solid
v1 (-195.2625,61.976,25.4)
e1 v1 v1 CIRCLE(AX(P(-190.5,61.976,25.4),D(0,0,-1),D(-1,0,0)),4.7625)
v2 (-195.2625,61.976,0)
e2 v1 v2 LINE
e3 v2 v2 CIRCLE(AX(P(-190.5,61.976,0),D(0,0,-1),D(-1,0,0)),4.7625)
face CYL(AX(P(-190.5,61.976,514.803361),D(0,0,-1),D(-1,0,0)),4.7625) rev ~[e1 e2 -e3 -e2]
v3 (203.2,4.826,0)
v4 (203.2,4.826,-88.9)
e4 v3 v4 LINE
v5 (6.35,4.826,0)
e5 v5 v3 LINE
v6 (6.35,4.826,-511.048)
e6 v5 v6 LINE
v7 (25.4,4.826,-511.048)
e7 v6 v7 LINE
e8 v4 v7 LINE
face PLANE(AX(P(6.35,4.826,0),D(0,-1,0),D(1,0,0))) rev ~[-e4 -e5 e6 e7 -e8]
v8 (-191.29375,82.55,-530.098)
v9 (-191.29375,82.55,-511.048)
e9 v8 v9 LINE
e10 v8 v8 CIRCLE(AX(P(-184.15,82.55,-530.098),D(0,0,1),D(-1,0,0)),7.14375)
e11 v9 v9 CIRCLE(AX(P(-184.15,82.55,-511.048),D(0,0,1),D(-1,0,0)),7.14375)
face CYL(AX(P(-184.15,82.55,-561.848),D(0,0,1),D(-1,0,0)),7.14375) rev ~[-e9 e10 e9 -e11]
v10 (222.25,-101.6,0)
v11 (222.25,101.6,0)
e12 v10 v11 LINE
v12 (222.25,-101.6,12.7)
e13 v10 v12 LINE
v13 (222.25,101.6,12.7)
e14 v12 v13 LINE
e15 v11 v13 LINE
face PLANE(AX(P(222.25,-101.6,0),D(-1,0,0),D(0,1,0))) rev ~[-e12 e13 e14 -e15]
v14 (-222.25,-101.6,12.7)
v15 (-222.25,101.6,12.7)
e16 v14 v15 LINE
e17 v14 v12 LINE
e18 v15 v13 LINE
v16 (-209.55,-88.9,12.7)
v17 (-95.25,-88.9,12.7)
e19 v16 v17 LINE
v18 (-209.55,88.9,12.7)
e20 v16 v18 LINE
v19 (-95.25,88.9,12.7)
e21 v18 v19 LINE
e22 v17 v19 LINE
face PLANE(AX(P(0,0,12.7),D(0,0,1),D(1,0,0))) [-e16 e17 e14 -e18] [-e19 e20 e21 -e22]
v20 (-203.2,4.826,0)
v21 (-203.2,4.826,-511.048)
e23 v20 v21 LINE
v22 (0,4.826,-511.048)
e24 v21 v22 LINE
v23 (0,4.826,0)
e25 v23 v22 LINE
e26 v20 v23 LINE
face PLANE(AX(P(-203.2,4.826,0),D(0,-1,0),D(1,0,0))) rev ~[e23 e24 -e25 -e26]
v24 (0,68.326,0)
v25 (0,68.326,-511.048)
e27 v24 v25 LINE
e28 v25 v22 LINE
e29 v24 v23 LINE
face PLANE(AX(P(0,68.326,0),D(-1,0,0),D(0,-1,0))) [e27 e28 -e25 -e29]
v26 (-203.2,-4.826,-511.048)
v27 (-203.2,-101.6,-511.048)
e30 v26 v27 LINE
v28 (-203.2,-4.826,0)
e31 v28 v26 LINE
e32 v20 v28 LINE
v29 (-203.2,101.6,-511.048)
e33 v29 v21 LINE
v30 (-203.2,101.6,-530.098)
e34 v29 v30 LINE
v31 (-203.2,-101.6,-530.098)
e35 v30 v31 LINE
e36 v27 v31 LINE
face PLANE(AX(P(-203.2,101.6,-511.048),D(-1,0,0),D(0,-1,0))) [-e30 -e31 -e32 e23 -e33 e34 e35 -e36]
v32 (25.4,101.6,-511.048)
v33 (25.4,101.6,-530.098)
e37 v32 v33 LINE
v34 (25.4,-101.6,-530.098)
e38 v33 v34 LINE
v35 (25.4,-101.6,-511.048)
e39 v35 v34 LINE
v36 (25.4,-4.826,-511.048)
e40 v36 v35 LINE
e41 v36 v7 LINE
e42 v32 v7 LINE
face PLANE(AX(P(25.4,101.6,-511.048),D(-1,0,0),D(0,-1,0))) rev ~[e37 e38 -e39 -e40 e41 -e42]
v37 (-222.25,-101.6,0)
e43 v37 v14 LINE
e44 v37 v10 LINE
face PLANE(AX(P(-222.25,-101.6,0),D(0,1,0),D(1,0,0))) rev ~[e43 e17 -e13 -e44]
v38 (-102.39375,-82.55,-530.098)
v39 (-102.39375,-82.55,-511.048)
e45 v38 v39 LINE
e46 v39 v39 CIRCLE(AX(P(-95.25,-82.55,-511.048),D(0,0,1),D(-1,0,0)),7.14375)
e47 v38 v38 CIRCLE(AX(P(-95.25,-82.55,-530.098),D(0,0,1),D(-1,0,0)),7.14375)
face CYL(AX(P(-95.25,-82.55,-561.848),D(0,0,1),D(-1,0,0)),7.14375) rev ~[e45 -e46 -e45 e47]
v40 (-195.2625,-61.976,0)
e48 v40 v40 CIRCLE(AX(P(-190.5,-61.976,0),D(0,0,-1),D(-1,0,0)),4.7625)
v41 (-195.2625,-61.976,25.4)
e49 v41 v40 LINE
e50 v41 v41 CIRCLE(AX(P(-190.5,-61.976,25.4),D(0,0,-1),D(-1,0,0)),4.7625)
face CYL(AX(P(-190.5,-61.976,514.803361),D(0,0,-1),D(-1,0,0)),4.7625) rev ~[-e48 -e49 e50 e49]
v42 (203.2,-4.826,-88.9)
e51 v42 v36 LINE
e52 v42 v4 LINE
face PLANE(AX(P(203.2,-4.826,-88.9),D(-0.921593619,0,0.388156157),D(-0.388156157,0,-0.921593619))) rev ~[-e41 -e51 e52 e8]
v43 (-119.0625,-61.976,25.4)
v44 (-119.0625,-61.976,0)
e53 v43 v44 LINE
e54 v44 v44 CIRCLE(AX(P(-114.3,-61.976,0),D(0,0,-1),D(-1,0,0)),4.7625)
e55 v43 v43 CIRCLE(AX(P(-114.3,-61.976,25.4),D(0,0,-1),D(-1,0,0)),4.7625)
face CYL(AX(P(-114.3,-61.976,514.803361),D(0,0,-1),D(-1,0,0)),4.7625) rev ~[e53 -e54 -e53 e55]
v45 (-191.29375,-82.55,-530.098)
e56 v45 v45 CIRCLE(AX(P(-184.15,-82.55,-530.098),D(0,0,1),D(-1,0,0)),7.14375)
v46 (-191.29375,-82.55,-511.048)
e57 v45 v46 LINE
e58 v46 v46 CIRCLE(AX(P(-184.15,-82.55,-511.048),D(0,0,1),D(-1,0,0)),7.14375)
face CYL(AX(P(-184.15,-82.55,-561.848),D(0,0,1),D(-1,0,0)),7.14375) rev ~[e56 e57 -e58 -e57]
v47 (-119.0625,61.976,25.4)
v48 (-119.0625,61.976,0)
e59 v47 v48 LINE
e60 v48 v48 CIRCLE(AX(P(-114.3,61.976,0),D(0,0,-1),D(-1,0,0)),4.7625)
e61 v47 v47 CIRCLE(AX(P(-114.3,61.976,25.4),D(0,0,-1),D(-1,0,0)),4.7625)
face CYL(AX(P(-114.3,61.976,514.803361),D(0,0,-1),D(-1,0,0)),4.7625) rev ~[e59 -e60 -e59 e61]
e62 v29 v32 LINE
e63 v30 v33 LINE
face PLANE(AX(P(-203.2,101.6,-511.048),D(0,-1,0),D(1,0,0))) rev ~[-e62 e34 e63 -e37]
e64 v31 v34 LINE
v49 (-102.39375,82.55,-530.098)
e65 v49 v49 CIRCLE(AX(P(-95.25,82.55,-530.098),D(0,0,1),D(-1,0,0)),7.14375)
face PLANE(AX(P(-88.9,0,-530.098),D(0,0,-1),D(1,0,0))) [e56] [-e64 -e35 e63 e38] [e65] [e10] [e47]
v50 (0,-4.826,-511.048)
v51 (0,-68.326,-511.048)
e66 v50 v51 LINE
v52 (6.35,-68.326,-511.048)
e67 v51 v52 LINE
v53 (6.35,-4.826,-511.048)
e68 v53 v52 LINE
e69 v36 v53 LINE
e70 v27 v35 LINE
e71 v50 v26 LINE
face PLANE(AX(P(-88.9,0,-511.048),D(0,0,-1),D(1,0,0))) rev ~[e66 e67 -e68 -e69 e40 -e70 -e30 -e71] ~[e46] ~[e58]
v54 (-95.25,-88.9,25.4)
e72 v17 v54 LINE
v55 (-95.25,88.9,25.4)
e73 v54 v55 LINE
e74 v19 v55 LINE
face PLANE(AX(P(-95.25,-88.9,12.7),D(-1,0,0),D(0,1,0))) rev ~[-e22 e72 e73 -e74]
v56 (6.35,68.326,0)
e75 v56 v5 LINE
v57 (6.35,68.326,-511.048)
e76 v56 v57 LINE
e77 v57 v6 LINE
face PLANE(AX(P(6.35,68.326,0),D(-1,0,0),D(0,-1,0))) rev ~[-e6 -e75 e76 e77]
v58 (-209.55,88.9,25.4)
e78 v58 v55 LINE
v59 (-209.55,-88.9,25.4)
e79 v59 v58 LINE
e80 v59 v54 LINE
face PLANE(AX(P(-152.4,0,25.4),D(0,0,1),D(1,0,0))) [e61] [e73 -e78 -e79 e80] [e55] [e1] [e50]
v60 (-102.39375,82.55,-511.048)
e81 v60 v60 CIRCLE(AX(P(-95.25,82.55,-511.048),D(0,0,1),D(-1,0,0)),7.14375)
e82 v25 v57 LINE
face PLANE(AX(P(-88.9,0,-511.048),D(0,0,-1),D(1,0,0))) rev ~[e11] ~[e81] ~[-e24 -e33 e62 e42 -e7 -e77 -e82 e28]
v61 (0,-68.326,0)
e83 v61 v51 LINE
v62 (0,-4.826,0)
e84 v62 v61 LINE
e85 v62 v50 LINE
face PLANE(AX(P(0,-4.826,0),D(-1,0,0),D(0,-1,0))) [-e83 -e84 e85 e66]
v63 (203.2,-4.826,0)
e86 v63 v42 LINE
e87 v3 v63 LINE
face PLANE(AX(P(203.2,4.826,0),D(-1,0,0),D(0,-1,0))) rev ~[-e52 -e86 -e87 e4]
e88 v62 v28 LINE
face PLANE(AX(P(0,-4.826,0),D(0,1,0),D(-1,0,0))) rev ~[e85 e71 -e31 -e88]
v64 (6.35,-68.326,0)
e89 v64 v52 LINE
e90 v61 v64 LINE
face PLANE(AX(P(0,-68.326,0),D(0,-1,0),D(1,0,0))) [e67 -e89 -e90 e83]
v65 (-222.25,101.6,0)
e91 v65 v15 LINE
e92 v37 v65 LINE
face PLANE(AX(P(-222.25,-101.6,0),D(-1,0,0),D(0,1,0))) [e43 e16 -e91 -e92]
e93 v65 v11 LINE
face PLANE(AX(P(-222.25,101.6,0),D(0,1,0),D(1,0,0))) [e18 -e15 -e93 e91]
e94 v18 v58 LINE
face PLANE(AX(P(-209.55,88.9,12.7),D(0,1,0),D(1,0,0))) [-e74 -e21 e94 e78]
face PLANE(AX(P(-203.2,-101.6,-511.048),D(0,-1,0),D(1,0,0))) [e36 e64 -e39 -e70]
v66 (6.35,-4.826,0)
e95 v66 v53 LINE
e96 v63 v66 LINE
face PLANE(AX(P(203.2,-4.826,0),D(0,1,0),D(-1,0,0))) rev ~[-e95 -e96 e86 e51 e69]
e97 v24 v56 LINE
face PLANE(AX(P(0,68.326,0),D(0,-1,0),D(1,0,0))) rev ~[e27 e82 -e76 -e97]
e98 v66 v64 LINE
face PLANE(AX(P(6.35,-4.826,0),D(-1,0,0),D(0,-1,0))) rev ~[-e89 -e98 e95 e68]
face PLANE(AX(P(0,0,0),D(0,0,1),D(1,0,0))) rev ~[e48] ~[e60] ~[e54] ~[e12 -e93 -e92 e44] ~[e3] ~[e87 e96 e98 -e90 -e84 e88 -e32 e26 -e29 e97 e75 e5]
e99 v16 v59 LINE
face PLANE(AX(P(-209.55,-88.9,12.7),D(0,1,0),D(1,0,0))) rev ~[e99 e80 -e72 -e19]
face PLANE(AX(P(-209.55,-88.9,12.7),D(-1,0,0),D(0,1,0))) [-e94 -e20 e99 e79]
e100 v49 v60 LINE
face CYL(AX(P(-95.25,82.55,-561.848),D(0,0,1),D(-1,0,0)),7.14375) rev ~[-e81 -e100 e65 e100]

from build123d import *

# Parameters (mm, degrees)
F0_W      = 444.5
F0_H      = 203.2
F1_DEPTH  = 12.7
F2_W      = 114.3
F2_H      = 177.8
F3_DEPTH  = 12.7
F5_D      = 9.525
F6_W      = 203.2
F6_H      = 9.652
F6_W_2    = 6.35
F6_H_2    = 63.5
F6_W_3    = 196.85
F7_DEPTH  = 511.048
F9_DEPTH  = 106.427
F10_W     = 228.6
F10_H     = 203.2
F11_DEPTH = 19.05
F13_D     = 14.2875
F13_DEPTH = 31.75
F13_TIP   = 4.2923980472


# Not quite as in the source:
# - a length typed as a fraction of an inch, garbled in the dataset ("3 / 203.2 mm" for 3/8 in), is restored


with BuildPart() as f1:
    # F0 (on Top) → F1 (new body)
    with BuildSketch(Plane.XY):
        Rectangle(F0_W, F0_H)
    extrude(amount=F1_DEPTH)

    # F2 (on face) → F3 (join)
    with BuildSketch(Plane.XY.offset(12.7)):
        with Locations((-152.4, 0)):
            Rectangle(F2_W, F2_H)
    extrude(amount=F3_DEPTH)

    # F5 (through all)
    with Locations(Plane.XY.offset(25.4)):
        with Locations((-190.5, 61.976), (-114.3, 61.976), (-114.3, -61.976), (-190.5, -61.976)):
            Hole(F5_D / 2)

    # F6 (on face) → F7 (join)
    with BuildSketch(Plane(origin=(0, 0, 0), x_dir=(1, 0, 0), z_dir=(0, 0, -1))):
        with Locations((-101.6, 0)):
            Rectangle(F6_W, F6_H)
        with Locations((3.175, 0)):
            Rectangle(F6_W_2, F6_H)
        with Locations((3.175, -36.576)):
            Rectangle(F6_W_2, F6_H_2)
        with Locations((104.775, 0)):
            Rectangle(F6_W_3, F6_H)
        with Locations((3.175, 36.576)):
            Rectangle(F6_W_2, F6_H_2)
    extrude(amount=F7_DEPTH)

    # F8 (on face) → F9 (cut, through all)
    with BuildSketch(Plane.XZ.offset(4.826)):
        Polygon((203.2, -88.9), (25.4, -511.048), (203.2, -511.048), align=None)
    extrude(amount=-F9_DEPTH, mode=Mode.SUBTRACT)

    # F10 (on face) → F11 (join)
    with BuildSketch(Plane(origin=(0, 0, -511.048), x_dir=(1, 0, 0), z_dir=(0, 0, -1))):
        with Locations((-88.9, 0)):
            Rectangle(F10_W, F10_H)
    extrude(amount=F11_DEPTH)

    # F13
    with Locations(Plane(origin=(0, 0, -530.098), x_dir=(1, 0, 0), z_dir=(0, 0, -1))):
        with Locations((-184.15, 82.55), (-95.25, 82.55), (-95.25, -82.55), (-184.15, -82.55)):
            Hole(F13_D / 2, depth=F13_DEPTH)
            with Locations((0, 0, -(F13_DEPTH + F13_TIP / 2))):  # 118° drill point
                Cone(0, F13_D / 2, F13_TIP, mode=Mode.SUBTRACT)


solid = f1.part
